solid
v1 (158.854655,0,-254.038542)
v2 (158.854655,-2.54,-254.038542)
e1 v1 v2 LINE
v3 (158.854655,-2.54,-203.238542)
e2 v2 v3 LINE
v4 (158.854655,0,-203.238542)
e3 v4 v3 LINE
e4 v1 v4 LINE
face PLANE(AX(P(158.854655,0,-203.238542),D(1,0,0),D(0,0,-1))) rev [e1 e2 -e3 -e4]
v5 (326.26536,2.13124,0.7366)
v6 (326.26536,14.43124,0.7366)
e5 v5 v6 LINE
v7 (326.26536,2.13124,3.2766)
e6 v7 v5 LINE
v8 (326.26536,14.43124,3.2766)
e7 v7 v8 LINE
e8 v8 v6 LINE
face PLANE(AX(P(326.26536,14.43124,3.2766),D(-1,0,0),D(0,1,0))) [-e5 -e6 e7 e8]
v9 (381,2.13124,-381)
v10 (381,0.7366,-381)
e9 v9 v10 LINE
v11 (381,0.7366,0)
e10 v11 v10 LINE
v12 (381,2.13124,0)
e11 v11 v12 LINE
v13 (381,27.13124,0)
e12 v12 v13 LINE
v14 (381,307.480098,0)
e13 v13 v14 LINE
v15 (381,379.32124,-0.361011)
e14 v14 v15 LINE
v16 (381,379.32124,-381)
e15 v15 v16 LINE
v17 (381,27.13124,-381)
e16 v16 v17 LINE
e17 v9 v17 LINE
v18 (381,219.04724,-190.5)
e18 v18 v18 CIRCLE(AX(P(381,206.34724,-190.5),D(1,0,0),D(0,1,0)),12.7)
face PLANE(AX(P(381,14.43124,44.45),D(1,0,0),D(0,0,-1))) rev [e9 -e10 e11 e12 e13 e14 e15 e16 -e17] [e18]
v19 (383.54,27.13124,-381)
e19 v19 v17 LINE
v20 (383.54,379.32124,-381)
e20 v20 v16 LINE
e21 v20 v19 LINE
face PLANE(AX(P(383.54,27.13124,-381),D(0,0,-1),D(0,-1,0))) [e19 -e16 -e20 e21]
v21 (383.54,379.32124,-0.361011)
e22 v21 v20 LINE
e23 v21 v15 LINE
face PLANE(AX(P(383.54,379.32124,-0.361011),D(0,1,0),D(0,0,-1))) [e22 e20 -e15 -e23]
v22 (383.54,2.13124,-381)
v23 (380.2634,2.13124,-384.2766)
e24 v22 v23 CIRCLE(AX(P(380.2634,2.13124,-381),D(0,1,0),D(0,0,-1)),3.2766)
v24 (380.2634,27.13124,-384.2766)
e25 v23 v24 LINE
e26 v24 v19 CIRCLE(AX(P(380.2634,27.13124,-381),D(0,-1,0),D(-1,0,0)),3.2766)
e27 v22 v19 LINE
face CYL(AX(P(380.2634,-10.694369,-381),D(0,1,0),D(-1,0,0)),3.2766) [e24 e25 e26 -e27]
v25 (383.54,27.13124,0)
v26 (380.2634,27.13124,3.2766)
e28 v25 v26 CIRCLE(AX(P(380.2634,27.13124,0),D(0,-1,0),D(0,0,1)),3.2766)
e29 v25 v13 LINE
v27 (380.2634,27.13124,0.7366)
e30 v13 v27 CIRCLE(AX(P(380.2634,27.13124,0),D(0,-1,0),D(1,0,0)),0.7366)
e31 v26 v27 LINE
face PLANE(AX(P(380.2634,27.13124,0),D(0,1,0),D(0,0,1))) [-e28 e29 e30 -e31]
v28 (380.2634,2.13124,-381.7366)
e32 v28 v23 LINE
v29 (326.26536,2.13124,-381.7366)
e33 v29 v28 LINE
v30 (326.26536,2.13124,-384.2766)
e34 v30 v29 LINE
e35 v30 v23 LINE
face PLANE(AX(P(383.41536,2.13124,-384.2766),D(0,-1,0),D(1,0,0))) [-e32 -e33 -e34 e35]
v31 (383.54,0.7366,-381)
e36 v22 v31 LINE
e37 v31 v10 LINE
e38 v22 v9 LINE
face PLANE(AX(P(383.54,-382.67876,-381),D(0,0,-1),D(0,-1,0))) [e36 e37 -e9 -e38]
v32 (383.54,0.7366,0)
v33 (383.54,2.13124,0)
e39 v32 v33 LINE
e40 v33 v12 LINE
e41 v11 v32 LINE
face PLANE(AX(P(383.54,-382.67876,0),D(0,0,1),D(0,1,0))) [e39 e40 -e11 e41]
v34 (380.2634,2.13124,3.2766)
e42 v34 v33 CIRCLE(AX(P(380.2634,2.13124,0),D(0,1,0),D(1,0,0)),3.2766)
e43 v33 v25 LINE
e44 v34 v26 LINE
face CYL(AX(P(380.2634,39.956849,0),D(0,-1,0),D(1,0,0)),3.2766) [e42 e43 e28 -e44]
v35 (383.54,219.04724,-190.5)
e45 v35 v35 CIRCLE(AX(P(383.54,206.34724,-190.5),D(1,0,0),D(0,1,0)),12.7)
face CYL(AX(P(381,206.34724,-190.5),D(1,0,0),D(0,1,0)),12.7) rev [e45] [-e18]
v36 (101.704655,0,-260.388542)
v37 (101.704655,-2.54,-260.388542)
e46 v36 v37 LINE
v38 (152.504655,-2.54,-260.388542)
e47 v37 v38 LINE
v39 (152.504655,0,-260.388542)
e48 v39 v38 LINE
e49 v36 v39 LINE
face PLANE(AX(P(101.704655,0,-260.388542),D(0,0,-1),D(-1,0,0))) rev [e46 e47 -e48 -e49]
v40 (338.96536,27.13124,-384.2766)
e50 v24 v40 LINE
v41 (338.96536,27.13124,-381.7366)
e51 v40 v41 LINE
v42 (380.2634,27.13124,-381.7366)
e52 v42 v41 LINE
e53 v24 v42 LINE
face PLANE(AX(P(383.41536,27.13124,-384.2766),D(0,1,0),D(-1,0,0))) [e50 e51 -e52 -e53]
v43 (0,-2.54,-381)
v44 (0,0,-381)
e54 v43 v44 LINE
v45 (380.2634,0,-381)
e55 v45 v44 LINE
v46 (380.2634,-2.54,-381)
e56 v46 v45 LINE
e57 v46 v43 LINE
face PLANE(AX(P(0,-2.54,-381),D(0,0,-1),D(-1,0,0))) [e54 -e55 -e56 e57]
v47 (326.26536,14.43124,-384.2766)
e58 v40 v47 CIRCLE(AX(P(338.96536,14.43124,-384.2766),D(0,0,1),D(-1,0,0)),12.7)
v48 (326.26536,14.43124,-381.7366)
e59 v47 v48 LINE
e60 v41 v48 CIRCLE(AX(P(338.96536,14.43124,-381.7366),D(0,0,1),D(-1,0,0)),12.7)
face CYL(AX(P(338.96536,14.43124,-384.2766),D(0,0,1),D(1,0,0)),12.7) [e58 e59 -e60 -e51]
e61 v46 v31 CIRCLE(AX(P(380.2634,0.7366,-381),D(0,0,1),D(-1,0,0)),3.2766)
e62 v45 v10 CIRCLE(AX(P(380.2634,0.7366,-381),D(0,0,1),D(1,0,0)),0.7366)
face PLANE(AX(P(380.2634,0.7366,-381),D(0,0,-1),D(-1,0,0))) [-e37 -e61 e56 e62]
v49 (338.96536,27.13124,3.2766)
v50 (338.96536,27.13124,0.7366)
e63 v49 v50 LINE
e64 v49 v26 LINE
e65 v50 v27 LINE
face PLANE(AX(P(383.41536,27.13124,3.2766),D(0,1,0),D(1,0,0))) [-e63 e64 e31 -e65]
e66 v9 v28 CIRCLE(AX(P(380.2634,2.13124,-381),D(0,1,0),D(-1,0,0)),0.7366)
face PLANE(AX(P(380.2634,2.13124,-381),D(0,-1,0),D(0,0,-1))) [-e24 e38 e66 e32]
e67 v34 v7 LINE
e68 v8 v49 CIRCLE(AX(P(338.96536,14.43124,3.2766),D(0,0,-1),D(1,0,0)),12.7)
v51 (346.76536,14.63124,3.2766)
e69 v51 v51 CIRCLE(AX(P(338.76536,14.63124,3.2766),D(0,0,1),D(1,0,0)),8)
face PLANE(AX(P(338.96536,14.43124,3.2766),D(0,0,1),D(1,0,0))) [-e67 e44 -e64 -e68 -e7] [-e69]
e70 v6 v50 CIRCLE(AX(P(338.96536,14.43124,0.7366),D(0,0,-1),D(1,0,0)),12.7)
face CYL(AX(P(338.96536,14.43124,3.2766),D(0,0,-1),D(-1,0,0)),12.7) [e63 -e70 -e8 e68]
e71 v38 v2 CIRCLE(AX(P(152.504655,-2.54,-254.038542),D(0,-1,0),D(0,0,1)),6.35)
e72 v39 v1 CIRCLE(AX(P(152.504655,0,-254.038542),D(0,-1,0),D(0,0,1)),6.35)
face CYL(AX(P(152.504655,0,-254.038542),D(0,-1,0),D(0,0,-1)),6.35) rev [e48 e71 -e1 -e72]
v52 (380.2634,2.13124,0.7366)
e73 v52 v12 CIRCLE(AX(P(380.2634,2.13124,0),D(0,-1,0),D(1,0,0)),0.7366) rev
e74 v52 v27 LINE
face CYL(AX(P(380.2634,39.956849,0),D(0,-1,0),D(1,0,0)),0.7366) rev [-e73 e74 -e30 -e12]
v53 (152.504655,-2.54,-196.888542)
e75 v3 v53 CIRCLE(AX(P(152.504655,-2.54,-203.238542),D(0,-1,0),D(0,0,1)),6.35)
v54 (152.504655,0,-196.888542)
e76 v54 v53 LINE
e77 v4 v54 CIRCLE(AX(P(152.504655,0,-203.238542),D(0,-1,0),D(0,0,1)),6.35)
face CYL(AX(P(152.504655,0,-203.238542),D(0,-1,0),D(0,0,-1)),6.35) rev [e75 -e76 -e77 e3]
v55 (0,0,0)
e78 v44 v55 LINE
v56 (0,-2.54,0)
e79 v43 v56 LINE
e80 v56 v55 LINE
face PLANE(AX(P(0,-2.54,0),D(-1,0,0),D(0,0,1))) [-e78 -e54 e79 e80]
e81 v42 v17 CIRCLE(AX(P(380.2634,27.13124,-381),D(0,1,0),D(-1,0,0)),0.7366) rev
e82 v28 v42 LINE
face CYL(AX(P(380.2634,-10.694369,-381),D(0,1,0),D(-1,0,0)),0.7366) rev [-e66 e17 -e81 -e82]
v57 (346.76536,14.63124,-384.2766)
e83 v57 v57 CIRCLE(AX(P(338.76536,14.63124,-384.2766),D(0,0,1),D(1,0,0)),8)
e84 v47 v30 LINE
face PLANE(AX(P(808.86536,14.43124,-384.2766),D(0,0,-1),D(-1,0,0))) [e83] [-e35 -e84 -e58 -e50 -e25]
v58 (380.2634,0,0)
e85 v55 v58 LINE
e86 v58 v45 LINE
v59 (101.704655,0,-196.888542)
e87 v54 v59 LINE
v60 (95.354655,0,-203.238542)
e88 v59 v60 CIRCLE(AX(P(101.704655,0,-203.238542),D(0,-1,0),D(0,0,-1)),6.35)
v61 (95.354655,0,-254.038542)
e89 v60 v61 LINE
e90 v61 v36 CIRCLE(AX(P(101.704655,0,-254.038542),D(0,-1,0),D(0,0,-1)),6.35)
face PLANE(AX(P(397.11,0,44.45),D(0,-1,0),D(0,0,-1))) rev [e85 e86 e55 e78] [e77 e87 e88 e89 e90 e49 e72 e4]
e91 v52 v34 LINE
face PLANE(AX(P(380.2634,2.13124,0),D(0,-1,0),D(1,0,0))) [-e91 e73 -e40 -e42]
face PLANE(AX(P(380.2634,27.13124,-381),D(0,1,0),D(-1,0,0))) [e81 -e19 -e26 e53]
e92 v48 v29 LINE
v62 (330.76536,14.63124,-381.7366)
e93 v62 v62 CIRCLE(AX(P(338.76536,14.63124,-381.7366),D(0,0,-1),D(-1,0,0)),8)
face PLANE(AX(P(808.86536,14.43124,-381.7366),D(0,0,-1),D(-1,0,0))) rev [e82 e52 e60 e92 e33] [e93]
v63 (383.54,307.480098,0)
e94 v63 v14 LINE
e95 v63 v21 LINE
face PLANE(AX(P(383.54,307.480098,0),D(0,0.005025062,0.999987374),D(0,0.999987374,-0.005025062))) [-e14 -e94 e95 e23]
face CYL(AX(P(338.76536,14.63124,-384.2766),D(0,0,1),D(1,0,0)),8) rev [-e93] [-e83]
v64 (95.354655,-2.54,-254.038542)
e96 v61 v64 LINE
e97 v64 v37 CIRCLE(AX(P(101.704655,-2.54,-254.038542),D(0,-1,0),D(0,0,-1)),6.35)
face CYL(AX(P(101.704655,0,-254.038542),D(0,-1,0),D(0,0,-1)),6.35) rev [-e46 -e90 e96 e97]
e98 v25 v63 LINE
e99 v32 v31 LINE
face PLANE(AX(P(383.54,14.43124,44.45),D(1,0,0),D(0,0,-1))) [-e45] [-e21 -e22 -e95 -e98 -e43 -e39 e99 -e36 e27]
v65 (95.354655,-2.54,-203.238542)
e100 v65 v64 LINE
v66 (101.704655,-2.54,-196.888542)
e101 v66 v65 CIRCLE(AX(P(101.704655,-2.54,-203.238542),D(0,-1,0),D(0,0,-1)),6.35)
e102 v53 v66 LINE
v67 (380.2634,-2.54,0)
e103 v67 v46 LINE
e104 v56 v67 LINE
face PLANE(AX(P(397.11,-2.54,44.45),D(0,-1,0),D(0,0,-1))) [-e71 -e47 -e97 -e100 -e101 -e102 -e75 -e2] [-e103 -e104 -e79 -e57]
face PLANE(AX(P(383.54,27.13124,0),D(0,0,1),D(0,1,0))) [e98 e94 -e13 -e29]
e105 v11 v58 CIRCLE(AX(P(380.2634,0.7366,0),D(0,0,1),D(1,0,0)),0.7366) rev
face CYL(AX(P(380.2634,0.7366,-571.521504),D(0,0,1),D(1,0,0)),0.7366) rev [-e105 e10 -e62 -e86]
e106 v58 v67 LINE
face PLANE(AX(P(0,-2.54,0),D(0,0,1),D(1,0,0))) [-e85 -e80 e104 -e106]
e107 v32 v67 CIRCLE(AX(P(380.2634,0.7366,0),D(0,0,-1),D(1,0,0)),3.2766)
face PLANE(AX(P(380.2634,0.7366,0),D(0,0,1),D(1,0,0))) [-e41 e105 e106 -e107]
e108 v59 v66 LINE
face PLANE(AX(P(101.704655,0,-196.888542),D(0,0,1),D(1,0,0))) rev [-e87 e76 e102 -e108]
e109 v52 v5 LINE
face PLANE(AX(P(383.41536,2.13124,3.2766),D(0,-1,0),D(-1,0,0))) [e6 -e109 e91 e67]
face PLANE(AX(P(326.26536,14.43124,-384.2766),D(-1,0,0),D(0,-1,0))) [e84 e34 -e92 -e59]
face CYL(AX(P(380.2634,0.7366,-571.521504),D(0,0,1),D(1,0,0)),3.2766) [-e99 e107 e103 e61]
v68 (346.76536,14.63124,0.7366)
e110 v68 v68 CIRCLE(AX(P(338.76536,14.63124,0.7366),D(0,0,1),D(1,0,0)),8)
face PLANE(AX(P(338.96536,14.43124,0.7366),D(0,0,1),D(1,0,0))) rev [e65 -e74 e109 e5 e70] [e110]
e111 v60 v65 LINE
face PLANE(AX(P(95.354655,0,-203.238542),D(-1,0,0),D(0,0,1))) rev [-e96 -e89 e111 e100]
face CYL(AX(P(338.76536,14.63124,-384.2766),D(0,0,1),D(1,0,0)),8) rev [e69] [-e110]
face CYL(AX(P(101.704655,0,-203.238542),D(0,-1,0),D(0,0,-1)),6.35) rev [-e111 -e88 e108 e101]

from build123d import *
from build123d.topology import SkipClean

# Parameters (mm, degrees)
BASE_FLANGE1_DEPTH       = 2.54
SKETCHED_START           = 383.54
SKETCHED_BEND2_OUTLINE_W = 2.54
SKETCHED_BEND2_OUTLINE_H = 495.3
SKETCHED_BEND2_DEPTH     = 378.46
SKETCHED_START_2         = 381
SKETCHED_BEND2_2_DEPTH   = 2.221317884
SKETCHED_START_3         = 380.2634
SKETCHED_BEND2_3_DEPTH   = 3.2766
SKETCHED_START_4         = -438.15
SKETCHED_BEND2_4_DEPTH   = 495.3
SKETCHED_START_5         = 2.131240091
SKETCHED_BEND7_DEPTH     = 25
SKETCHED_BEND7_2_DEPTH   = 12.3
SKETCHED_START_6         = -384.2766
SKETCHED_BEND7_3_DEPTH   = 3.158240169
SKETCHED_START_7         = 0.118359831
SKETCHED_BEND7_4_DEPTH   = 3.158240169
SKETCHED_START_8         = 14.431240091
SKETCHED_BEND7_5_DEPTH   = 12.7
SKETCHED_BEND7_6_DEPTH   = 12.7
SKETCH20_R               = 8
CUT_EXTRUDE1_DEPTH       = 665.217598099
SKETCH21_R               = 12.7
CUT_EXTRUDE2_DEPTH       = 2.54
CUT_EXTRUDE3_DEPTH       = 2.54


with BuildPart() as part:
    # Base-Flange1: sheet metal written as solids
    # Sketch1 → Base-Flange1 (new body)
    with BuildSketch(Plane(origin=(0, 0, 0), x_dir=(1, 0, 0), z_dir=(0, 1, 0))):
        with BuildLine():
            Line((0, 0), (0, 381))
            Line((0, 381), (384.81, 381))
            Line((384.81, 381), (384.81, 438.15))
            Line((384.81, 438.15), (397.11, 438.15))
            ThreePointArc((397.11, 438.15), (406.090256121, 434.430256121), (409.81, 425.45))
            Line((409.81, 425.45), (409.81, 381))
            Line((409.81, 381), (690.157951031, 381))
            Line((690.157951031, 381), (762, 381))
            Line((762, 381), (762, 0.361010763))
            Line((762, 0.361010763), (690.158858088, 0))
            Line((690.158858088, 0), (409.81, 0))
            Line((409.81, 0), (409.81, -44.45))
            ThreePointArc((409.81, -44.45), (406.090256121, -53.430256121), (397.11, -57.15))
            Line((397.11, -57.15), (384.81, -57.15))
            Line((384.81, -57.15), (384.81, 0))
            Line((384.81, 0), (0, 0))
        make_face()
    extrude(amount=-BASE_FLANGE1_DEPTH)

    # Sketched Bend2: read off the stored shape, not the designer's step
    # Sketched Bend2 outline → Sketched Bend2 (cut)
    with BuildSketch(Plane.YZ.offset(SKETCHED_START)):
        with Locations((-1.27, -190.5)):
            Rectangle(SKETCHED_BEND2_OUTLINE_W, SKETCHED_BEND2_OUTLINE_H)
    extrude(amount=SKETCHED_BEND2_DEPTH, mode=Mode.SUBTRACT)

    # Sketched Bend2 2 outline → Sketched Bend2 2 (add)
    with BuildSketch(Plane.YZ.offset(SKETCHED_START_2)):
        with BuildLine():
            Line((2.131240091, 57.15), (2.131240091, 0))
            Line((2.131240091, 0), (0, 0))
            Line((0, 0), (0, -381))
            Line((0, -381), (2.131240091, -381))
            Line((2.131240091, -381), (2.131240091, -438.15))
            Line((2.131240091, -438.15), (14.431240091, -438.15))
            ThreePointArc((14.431240091, -438.15), (23.411496212, -434.430256121), (27.131240091, -425.45))
            Line((27.131240091, -425.45), (27.131240091, -381))
            Line((27.131240091, -381), (379.321240091, -381))
            Line((379.321240091, -381), (379.321240091, -0.361010763))
            Line((379.321240091, -0.361010763), (307.480098179, 0))
            Line((307.480098179, 0), (27.131240091, 0))
            Line((27.131240091, 0), (27.131240091, 44.45))
            ThreePointArc((27.131240091, 44.45), (23.411496212, 53.430256121), (14.431240091, 57.15))
            Line((14.431240091, 57.15), (2.131240091, 57.15))
        make_face()
    extrude(amount=SKETCHED_BEND2_2_DEPTH)

    # Sketched Bend2 3 outline → Sketched Bend2 3 (add)
    with BuildSketch(Plane.YZ.offset(SKETCHED_START_3)):
        with BuildLine():
            Line((2.131240091, 57.15), (2.131240091, 0))
            Line((2.131240091, 0), (0, 0))
            Line((0, 0), (0, -381))
            Line((0, -381), (2.131240091, -381))
            Line((2.131240091, -381), (2.131240091, -438.15))
            Line((2.131240091, -438.15), (14.431240091, -438.15))
            ThreePointArc((14.431240091, -438.15), (23.411496212, -434.430256121), (27.131240091, -425.45))
            Line((27.131240091, -425.45), (27.131240091, -381))
            Line((27.131240091, -381), (379.321240091, -381))
            Line((379.321240091, -381), (379.321240091, -0.361010763))
            Line((379.321240091, -0.361010763), (307.480098179, 0))
            Line((307.480098179, 0), (27.131240091, 0))
            Line((27.131240091, 0), (27.131240091, 44.45))
            ThreePointArc((27.131240091, 44.45), (23.411496212, 53.430256121), (14.431240091, 57.15))
            Line((14.431240091, 57.15), (2.131240091, 57.15))
        make_face()
    extrude(amount=SKETCHED_BEND2_3_DEPTH)

    # Sketched Bend2 4 outline → Sketched Bend2 4 (cut)
    with BuildSketch(Plane.XY.offset(SKETCHED_START_4)):
        with BuildLine():
            ThreePointArc((380.2634, 0), (380.784254855, 0.215745145), (381, 0.7366))
            Line((381, 0.7366), (381, 379.321240091))
            Line((381, 379.321240091), (380.2634, 379.321240091))
            Line((380.2634, 379.321240091), (380.2634, 0))
        make_face()
        with BuildLine():
            Line((383.54, -2.54), (383.54, 0.7366))
            ThreePointArc((383.54, 0.7366), (382.580306079, -1.580306079), (380.2634, -2.54))
            Line((380.2634, -2.54), (383.54, -2.54))
        make_face()
    extrude(amount=SKETCHED_BEND2_4_DEPTH, mode=Mode.SUBTRACT)

    # Sketched Bend7: read off the stored shape, not the designer's step
    # Sketched Bend7 outline → Sketched Bend7 (cut)
    with BuildSketch(Plane(origin=(0, 0, 0), x_dir=(1, 0, 0), z_dir=(0, 1, 0)).offset(SKETCHED_START_5)):
        with BuildLine():
            Line((383.54, -57.15), (383.54, 0))
            ThreePointArc((383.54, 0), (382.827542266, -2.039922057), (381, -3.192730493))
            Line((381, -3.192730493), (381, -57.15))
            Line((381, -57.15), (383.54, -57.15))
        make_face()
        with BuildLine():
            ThreePointArc((381, 384.192730493), (382.827542266, 383.039922057), (383.54, 381))
            Line((383.54, 381), (383.54, 438.15))
            Line((383.54, 438.15), (381, 438.15))
            Line((381, 438.15), (381, 384.192730493))
        make_face()
    extrude(amount=SKETCHED_BEND7_DEPTH, mode=Mode.SUBTRACT)

    # Sketched Bend7 2 outline → Sketched Bend7 2 (add)
    with BuildSketch(Plane(origin=(0, 0, 0), x_dir=(1, 0, 0), z_dir=(0, 1, 0)).offset(SKETCHED_START_5)):
        with BuildLine():
            ThreePointArc((380.2634, -3.2766), (380.634079664, -3.255565104), (381, -3.192730493))
            Line((381, -3.192730493), (381, 0))
            ThreePointArc((381, 0), (380.784254855, -0.520854855), (380.2634, -0.7366))
            Line((380.2634, -0.7366), (326.265359909, -0.7366))
            Line((326.265359909, -0.7366), (326.265359909, -3.2766))
            Line((326.265359909, -3.2766), (380.2634, -3.2766))
        make_face()
        with BuildLine():
            Line((381, 381), (381, 384.192730493))
            ThreePointArc((381, 384.192730493), (380.634079664, 384.255565104), (380.2634, 384.2766))
            Line((380.2634, 384.2766), (326.265359909, 384.2766))
            Line((326.265359909, 384.2766), (326.265359909, 381.7366))
            Line((326.265359909, 381.7366), (380.2634, 381.7366))
            ThreePointArc((380.2634, 381.7366), (380.784254855, 381.520854855), (381, 381))
        make_face()
    extrude(amount=SKETCHED_BEND7_2_DEPTH)

    # Sketched Bend7 3 outline → Sketched Bend7 3 (add)
    with BuildSketch(Plane.XY.offset(SKETCHED_START_6)):
        with BuildLine():
            Line((381, 14.431240091), (381, 27.131240091))
            Line((381, 27.131240091), (338.965359909, 27.131240091))
            ThreePointArc((338.965359909, 27.131240091), (329.985103788, 23.411496212), (326.265359909, 14.431240091))
            Line((326.265359909, 14.431240091), (381, 14.431240091))
        make_face()
    extrude(amount=SKETCHED_BEND7_3_DEPTH)

    # Sketched Bend7 4 outline → Sketched Bend7 4 (add)
    with BuildSketch(Plane.XY.offset(SKETCHED_START_7)):
        with BuildLine():
            Line((381, 14.431240091), (381, 27.131240091))
            Line((381, 27.131240091), (338.965359909, 27.131240091))
            ThreePointArc((338.965359909, 27.131240091), (329.985103788, 23.411496212), (326.265359909, 14.431240091))
            Line((326.265359909, 14.431240091), (381, 14.431240091))
        make_face()
    extrude(amount=SKETCHED_BEND7_4_DEPTH)

    # Sketched Bend7 5 outline → Sketched Bend7 5 (cut)
    with SkipClean():  # the faces are left unmerged after this step: merging them gives an invalid solid
        with BuildSketch(Plane(origin=(0, 0, 0), x_dir=(1, 0, 0), z_dir=(0, 1, 0)).offset(SKETCHED_START_8)):
            with BuildLine():
                Line((381, -3.2766), (381, -3.192730493))
                ThreePointArc((381, -3.192730493), (380.634079664, -3.255565104), (380.2634, -3.2766))
                Line((380.2634, -3.2766), (325, -3.276600014))
                Line((325, -3.276600014), (325, -5))
                Line((325, -5), (381.000000013, -5))
                Line((381.000000013, -5), (381, -3.2766))
            make_face()
            with BuildLine():
                ThreePointArc((380.2634, -0.7366), (380.740576963, -0.561143213), (380.990428549, -0.118359831))
                Line((380.990428549, -0.118359831), (325, -0.118359831))
                Line((325, -0.118359831), (325, -0.7366))
                Line((325, -0.7366), (380.2634, -0.7366))
            make_face()
            with BuildLine():
                Line((325, 381.118359831), (380.990428549, 381.118359831))
                ThreePointArc((380.990428549, 381.118359831), (380.740576963, 381.561143213), (380.2634, 381.7366))
                Line((380.2634, 381.7366), (325, 381.7366))
                Line((325, 381.7366), (325, 381.118359831))
            make_face()
            with BuildLine():
                ThreePointArc((380.2634, 384.2766), (380.634079664, 384.255565104), (381, 384.192730493))
                Line((381, 384.192730493), (381, 384.2766))
                Line((381, 384.2766), (381.000000039, 386))
                Line((381.000000039, 386), (325, 386))
                Line((325, 386), (325, 384.276600014))
                Line((325, 384.276600014), (380.2634, 384.2766))
            make_face()
        extrude(amount=SKETCHED_BEND7_5_DEPTH, mode=Mode.SUBTRACT)

    # Sketched Bend7 6 outline → Sketched Bend7 6 (add)
    with SkipClean():  # the faces are left unmerged after this step: merging them gives an invalid solid
        with BuildSketch(Plane(origin=(0, 0, 0), x_dir=(1, 0, 0), z_dir=(0, 1, 0)).offset(SKETCHED_START_8)):
            with BuildLine():
                Line((380.990428549, -0.118359831), (381, -0.118359831))
                Line((381, -0.118359831), (381, 0))
                ThreePointArc((381, 0), (380.997603238, -0.059373105), (380.990428549, -0.118359831))
            make_face()
            with BuildLine():
                ThreePointArc((380.990428549, 381.118359831), (380.997603238, 381.059373105), (381, 381))
                Line((381, 381), (381.000000039, 381.118359831))
                Line((381.000000039, 381.118359831), (380.990428549, 381.118359831))
            make_face()
        extrude(amount=SKETCHED_BEND7_6_DEPTH)

    # Sketch20 → Cut-Extrude1 (cut, through all)
    with SkipClean():  # the faces are left unmerged after this step: merging them gives an invalid solid
        with BuildSketch(Plane.XY.offset(3.2766)):
            with Locations((338.765359909, 14.631240091)):
                Circle(SKETCH20_R)
        extrude(amount=-CUT_EXTRUDE1_DEPTH, mode=Mode.SUBTRACT)

    # Sketch21 → Cut-Extrude2 (cut)
    with SkipClean():  # the faces are left unmerged after this step: merging them gives an invalid solid
        with BuildSketch(Plane(origin=(383.54, 0, 0), x_dir=(0, 0, -1), z_dir=(1, 0, 0))):
            with Locations(Location((190.5, 206.347240091, 0), (0, 0, 90))):
                Circle(SKETCH21_R)
        extrude(amount=-CUT_EXTRUDE2_DEPTH, mode=Mode.SUBTRACT)

    # Sketch22 → Cut-Extrude3 (cut)
    with SkipClean():  # the faces are left unmerged after this step: merging them gives an invalid solid
        with BuildSketch(Plane.XZ.offset(2.54)):
            with BuildLine():
                Line((101.704654894, -196.888541513), (152.504654894, -196.888541513))
                ThreePointArc((152.504654894, -196.888541513), (156.994782955, -198.748413452), (158.854654894, -203.238541513))
                Line((158.854654894, -203.238541513), (158.854654894, -254.038541513))
                ThreePointArc((158.854654894, -254.038541513), (156.994782955, -258.528669573), (152.504654894, -260.388541513))
                Line((152.504654894, -260.388541513), (101.704654894, -260.388541513))
                ThreePointArc((101.704654894, -260.388541513), (97.214526834, -258.528669573), (95.354654894, -254.038541513))
                Line((95.354654894, -254.038541513), (95.354654894, -203.238541513))
                ThreePointArc((95.354654894, -203.238541513), (97.214526834, -198.748413452), (101.704654894, -196.888541513))
            make_face()
        extrude(amount=-CUT_EXTRUDE3_DEPTH, mode=Mode.SUBTRACT)


solid = part.part
